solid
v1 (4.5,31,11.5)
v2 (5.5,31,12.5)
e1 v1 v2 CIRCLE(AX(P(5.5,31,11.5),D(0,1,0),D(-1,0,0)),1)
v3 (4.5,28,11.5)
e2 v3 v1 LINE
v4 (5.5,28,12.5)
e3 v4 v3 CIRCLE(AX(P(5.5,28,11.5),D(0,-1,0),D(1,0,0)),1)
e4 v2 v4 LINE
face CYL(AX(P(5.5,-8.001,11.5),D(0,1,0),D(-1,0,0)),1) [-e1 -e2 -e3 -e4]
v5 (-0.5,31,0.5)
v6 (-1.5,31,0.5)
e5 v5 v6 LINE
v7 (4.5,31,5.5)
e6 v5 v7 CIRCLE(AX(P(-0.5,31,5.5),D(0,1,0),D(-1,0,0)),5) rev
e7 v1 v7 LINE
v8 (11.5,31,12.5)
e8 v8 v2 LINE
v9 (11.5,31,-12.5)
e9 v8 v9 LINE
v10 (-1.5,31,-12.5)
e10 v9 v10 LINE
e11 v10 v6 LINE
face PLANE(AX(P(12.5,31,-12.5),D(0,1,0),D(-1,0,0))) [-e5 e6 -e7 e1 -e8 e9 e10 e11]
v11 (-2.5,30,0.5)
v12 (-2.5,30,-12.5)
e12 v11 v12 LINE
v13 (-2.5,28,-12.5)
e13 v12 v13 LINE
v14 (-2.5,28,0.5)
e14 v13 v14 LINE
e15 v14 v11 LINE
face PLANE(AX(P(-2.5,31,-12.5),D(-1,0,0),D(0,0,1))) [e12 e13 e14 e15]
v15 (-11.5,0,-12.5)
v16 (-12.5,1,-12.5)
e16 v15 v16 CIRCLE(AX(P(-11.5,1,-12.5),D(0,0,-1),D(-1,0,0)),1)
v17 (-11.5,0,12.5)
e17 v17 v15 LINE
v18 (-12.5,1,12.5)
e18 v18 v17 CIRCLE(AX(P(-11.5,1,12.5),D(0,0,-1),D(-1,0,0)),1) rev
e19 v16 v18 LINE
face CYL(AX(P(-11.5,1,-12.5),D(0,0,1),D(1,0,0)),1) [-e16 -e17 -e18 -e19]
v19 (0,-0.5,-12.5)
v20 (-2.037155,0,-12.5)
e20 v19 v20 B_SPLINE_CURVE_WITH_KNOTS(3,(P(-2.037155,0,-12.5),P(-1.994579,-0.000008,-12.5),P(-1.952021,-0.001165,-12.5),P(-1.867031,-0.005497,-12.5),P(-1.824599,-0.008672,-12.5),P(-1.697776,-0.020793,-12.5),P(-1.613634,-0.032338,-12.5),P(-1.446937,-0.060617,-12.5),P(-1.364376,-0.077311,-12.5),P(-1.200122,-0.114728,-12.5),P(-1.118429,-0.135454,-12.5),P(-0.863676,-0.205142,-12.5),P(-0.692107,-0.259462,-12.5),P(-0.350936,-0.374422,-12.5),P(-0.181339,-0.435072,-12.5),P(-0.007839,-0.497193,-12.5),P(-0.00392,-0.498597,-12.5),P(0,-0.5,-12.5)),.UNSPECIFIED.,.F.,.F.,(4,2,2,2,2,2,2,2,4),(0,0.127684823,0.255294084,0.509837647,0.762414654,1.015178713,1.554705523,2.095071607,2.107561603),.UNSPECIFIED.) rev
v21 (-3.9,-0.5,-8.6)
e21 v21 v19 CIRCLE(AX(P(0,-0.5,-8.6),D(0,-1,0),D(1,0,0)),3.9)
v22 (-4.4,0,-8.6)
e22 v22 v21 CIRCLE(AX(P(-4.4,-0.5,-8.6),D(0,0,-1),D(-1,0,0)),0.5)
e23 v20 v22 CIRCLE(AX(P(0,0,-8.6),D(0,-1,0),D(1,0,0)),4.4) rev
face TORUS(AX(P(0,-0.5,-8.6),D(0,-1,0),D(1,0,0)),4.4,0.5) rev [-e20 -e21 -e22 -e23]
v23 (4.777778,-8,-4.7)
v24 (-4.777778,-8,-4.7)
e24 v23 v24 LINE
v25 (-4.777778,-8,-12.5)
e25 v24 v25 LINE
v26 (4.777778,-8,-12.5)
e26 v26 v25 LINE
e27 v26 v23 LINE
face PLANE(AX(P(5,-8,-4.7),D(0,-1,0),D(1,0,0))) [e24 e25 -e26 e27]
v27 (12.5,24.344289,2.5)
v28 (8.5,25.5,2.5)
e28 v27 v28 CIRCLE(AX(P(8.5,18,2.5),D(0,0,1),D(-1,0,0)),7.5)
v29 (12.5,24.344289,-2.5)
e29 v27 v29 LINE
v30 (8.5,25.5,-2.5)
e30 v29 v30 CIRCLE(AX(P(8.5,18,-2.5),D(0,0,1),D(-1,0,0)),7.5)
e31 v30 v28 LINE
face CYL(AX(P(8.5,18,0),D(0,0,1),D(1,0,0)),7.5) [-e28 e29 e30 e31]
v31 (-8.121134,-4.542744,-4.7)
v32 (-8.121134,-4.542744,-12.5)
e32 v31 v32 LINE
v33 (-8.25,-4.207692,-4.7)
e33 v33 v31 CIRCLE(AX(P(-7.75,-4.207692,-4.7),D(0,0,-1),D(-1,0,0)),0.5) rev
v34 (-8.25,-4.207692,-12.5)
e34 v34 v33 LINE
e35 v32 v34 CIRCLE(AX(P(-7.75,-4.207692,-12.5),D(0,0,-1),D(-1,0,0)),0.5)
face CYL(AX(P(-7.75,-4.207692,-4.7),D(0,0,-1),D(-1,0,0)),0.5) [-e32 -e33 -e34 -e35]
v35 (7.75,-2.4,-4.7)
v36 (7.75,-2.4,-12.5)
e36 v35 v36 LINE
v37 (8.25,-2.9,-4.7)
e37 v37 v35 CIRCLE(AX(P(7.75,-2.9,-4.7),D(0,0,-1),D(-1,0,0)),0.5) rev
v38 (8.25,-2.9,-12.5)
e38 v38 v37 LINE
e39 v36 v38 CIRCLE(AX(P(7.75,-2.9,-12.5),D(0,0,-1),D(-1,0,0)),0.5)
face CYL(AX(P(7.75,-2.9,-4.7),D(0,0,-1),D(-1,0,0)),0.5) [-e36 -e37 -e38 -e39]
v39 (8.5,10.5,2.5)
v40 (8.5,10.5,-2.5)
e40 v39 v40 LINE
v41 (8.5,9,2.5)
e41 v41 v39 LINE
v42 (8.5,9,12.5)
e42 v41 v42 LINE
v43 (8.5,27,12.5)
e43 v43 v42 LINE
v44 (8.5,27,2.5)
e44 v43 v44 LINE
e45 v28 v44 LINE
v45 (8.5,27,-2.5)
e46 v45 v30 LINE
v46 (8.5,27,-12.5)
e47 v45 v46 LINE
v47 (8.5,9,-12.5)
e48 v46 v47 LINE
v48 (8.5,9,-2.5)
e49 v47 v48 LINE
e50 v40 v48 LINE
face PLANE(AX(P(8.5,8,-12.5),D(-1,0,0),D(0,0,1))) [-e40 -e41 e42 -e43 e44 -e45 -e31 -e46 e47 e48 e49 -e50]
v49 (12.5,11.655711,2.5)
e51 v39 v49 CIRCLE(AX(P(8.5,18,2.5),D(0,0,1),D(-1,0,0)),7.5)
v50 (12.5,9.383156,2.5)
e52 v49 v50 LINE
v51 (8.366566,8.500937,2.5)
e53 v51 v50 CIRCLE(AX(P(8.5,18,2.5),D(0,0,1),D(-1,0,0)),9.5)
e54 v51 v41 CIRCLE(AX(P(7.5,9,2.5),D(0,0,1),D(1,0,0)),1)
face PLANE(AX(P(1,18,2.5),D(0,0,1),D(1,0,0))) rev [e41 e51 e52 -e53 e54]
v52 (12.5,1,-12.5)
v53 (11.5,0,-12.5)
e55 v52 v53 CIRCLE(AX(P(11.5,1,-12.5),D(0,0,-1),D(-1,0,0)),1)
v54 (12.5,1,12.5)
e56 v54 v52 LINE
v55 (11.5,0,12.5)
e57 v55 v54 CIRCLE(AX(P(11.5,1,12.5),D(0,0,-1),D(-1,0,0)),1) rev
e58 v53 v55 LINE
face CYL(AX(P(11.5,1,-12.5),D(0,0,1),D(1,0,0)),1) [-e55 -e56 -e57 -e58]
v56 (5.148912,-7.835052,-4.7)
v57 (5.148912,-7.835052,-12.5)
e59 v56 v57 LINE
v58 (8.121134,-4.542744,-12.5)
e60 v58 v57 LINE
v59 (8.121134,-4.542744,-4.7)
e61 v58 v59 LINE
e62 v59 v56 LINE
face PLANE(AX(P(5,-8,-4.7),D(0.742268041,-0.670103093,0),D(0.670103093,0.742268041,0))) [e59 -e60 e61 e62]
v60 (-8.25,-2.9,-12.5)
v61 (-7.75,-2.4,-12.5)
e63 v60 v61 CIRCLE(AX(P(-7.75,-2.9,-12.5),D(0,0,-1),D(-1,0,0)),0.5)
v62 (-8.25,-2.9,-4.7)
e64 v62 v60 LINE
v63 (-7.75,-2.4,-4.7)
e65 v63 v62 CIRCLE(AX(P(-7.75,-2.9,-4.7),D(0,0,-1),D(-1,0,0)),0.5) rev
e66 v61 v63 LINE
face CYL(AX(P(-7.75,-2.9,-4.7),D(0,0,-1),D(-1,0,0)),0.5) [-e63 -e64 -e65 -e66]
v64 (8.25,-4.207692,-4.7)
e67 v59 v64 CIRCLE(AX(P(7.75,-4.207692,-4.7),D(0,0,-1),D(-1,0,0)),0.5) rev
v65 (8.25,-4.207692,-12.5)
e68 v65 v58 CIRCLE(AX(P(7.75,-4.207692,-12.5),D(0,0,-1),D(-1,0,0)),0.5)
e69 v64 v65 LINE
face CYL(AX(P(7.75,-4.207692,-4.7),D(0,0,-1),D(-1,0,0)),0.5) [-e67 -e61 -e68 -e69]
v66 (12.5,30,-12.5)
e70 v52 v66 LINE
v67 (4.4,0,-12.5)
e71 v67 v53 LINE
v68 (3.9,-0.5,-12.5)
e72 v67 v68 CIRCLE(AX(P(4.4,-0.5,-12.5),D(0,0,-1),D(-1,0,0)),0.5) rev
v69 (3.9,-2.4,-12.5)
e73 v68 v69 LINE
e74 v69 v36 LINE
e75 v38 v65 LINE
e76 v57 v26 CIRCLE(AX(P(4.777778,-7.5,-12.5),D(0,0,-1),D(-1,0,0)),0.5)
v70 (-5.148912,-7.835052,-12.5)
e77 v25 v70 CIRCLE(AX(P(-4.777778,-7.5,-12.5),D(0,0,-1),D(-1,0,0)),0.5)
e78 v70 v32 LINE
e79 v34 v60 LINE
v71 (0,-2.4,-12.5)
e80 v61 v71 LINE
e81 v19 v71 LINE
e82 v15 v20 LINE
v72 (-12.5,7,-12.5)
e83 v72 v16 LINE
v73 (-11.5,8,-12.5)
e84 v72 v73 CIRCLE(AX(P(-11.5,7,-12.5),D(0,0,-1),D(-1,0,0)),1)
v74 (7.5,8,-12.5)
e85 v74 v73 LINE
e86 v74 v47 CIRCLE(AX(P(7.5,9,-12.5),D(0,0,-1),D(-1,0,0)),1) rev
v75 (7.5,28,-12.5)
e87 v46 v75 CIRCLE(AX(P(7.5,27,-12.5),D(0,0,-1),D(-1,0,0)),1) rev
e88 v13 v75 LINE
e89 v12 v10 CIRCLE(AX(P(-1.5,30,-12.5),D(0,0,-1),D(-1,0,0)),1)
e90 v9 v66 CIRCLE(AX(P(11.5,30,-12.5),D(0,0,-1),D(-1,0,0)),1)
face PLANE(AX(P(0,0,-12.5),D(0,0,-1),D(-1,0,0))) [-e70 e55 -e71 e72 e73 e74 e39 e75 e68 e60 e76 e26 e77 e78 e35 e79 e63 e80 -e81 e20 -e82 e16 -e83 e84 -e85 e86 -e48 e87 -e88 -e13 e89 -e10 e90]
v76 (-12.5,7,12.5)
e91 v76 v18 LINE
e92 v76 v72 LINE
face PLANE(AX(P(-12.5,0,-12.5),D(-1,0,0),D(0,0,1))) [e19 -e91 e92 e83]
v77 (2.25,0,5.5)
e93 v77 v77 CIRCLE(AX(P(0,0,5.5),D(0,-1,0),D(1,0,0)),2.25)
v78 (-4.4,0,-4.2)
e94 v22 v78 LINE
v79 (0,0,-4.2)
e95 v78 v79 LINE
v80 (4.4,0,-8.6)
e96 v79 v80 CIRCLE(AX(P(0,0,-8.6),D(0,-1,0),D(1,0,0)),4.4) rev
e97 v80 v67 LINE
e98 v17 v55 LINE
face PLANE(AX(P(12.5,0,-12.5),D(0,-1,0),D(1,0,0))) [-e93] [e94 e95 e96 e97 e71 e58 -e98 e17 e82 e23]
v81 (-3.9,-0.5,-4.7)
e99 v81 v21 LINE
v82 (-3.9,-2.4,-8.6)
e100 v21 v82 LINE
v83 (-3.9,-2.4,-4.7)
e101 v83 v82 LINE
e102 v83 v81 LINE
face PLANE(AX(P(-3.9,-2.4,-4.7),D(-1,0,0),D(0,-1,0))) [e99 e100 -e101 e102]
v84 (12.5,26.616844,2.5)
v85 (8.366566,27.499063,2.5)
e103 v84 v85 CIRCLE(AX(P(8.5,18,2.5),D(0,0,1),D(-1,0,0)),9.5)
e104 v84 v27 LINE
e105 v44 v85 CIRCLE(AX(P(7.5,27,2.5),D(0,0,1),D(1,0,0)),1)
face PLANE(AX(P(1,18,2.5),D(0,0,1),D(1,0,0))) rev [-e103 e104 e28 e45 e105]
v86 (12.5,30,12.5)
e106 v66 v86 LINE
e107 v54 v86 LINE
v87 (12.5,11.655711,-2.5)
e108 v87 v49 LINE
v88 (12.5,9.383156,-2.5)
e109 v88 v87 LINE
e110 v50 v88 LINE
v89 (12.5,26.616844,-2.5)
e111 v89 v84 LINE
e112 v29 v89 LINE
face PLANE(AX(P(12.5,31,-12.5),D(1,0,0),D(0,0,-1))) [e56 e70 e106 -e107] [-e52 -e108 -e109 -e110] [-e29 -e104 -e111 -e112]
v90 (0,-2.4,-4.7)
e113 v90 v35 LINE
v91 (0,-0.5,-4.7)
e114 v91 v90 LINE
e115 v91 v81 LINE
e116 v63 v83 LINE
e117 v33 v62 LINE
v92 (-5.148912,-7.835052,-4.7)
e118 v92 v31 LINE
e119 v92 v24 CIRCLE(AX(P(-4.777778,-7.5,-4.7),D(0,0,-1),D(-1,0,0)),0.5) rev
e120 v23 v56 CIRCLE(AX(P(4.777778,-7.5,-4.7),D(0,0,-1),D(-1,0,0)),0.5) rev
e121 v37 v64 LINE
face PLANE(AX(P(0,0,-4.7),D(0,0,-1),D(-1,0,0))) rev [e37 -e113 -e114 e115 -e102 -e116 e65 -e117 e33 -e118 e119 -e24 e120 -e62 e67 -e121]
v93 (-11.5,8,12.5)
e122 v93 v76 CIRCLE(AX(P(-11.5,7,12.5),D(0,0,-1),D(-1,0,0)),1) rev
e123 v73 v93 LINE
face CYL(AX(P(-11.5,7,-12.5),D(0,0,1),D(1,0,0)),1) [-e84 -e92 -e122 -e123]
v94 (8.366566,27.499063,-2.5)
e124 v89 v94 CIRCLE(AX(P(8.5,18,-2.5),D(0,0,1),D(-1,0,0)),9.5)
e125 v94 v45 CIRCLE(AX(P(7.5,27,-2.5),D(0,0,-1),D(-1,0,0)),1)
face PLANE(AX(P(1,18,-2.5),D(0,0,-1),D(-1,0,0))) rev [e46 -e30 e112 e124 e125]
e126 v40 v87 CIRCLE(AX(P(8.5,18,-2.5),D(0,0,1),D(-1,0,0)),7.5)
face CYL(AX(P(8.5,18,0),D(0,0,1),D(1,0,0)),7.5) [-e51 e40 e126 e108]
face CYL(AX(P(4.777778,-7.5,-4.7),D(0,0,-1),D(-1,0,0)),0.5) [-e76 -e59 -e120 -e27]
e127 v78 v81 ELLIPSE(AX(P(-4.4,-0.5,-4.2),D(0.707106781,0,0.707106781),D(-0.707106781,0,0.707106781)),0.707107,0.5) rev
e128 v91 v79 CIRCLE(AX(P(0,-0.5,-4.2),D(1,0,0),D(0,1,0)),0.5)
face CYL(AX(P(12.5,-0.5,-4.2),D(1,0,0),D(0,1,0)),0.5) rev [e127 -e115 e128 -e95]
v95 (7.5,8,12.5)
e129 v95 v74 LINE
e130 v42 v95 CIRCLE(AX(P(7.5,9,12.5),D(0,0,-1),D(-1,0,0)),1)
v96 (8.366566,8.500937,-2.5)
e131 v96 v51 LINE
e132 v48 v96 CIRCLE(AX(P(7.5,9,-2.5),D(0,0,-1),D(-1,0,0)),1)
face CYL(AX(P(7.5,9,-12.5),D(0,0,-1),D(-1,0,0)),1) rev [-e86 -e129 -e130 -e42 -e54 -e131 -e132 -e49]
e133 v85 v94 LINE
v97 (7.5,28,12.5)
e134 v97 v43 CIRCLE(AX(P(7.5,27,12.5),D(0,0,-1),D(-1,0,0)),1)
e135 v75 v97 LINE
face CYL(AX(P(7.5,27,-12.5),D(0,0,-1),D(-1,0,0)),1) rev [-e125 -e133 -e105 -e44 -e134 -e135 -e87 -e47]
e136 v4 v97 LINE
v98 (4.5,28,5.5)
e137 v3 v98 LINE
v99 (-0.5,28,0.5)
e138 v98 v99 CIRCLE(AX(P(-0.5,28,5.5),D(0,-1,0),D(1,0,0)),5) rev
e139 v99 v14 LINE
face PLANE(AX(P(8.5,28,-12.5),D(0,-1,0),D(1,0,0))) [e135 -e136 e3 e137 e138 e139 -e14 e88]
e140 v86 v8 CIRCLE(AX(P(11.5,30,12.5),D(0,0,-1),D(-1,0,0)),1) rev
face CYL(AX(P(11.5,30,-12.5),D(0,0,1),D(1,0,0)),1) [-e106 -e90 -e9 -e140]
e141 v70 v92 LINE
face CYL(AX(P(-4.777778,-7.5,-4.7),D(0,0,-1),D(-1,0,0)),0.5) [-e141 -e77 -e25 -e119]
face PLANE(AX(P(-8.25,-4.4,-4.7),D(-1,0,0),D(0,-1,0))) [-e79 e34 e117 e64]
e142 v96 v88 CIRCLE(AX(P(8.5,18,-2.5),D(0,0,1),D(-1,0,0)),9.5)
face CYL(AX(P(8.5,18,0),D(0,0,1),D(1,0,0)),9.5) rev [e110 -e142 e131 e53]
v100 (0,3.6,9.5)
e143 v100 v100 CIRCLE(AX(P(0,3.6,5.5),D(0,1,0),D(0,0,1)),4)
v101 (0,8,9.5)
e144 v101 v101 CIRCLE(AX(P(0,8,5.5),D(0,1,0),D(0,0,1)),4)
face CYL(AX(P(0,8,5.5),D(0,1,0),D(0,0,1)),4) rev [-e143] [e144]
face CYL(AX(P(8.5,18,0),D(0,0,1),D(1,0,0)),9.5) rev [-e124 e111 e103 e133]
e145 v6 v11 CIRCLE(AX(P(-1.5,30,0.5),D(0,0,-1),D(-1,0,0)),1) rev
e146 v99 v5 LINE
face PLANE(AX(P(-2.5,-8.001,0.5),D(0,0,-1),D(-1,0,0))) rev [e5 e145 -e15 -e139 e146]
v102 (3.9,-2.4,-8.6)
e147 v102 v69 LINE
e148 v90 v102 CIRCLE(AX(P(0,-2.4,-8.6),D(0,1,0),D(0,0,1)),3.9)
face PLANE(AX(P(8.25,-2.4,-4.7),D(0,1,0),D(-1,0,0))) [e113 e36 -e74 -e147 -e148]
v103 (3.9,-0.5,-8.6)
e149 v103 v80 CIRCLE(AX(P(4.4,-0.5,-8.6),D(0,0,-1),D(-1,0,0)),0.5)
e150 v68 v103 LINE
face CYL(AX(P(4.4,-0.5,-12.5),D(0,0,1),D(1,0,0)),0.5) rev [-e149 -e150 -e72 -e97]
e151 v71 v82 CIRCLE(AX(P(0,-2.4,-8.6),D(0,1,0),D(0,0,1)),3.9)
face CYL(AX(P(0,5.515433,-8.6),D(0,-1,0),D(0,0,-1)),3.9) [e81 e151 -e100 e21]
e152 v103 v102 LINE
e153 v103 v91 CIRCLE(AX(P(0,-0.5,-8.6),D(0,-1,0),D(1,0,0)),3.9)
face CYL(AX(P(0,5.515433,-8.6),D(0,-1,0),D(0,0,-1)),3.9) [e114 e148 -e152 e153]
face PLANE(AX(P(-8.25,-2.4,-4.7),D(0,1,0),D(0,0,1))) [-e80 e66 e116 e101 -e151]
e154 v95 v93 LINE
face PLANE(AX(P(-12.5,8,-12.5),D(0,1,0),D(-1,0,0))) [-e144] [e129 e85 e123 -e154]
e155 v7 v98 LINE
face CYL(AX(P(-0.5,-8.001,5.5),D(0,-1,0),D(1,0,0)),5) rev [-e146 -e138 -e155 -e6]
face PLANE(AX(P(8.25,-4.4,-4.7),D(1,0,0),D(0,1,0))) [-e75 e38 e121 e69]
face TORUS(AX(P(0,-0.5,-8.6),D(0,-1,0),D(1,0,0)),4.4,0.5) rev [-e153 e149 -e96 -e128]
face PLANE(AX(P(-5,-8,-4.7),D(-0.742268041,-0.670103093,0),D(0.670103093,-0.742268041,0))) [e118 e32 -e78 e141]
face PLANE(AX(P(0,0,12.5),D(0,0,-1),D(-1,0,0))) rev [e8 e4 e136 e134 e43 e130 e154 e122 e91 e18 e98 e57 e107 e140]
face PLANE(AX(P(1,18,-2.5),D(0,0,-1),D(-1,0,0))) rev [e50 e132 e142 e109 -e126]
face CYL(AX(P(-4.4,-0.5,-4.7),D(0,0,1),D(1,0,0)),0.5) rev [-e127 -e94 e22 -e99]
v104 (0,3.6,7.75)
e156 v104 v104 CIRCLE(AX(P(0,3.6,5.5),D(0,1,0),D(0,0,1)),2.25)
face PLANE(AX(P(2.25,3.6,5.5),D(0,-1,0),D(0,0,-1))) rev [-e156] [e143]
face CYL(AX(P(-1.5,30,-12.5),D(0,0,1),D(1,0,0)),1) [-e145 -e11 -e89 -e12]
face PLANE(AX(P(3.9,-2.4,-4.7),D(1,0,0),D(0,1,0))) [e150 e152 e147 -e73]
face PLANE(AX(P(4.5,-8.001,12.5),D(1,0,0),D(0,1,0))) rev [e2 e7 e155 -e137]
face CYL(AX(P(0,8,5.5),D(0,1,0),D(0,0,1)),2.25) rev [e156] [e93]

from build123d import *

# Parameters (mm, degrees)
BOSS_EXTRUDE1_DEPTH                                 = 12.5
CBORE_FOR_M4_HEX_SOCKET_HEAD_CAP_SCREW1_D           = 4.5
CBORE_FOR_M4_HEX_SOCKET_HEAD_CAP_SCREW1_DEPTH       = 8
CBORE_FOR_M4_HEX_SOCKET_HEAD_CAP_SCREW1_CBORE_D     = 8
CBORE_FOR_M4_HEX_SOCKET_HEAD_CAP_SCREW1_CBORE_DEPTH = 4.4
BOSS_EXTRUDE3_DEPTH                                 = 7.8
CUT_EXTRUDE3_REACH                                  = 44.819
SKETCH15_W                                          = 6.999999999999991
SKETCH15_H                                          = 12.000000000000002
CUT_EXTRUDE1_DEPTH                                  = 2.4
FILLET3_R                                           = 0.5
SKETCH13_W                                          = 1.9999999999999998
SKETCH13_H                                          = 5
FILLET4_START                                       = 28
FILLET4_DEPTH                                       = 3
FILLET4_START_2                                     = -12.5
FILLET4_2_DEPTH                                     = 25
FILLET4_3_DEPTH                                     = 10
FILLET4_START_3                                     = 2.5
FILLET4_4_DEPTH                                     = 10
FILLET4_START_4                                     = 27
FILLET4_5_DEPTH                                     = 5
FILLET4_START_5                                     = -13
FILLET4_6_DEPTH                                     = 26


with BuildPart() as part:
    # Sketch1 → Boss-Extrude1 (new, symmetric)
    with BuildSketch(Plane.XY):
        Polygon((-12.5, 7.999999999999993), (8.500000000000004, 7.9999999999999885), (8.500000000000004, 27.999999999999982), (-2.4999999999999987, 27.999999999999975), (-2.4999999999999987, 30.99999999999999), (12.5, 31), (12.5, -2.94e-15), (-12.5, -1.41e-15), align=None)
    extrude(amount=BOSS_EXTRUDE1_DEPTH, both=True)

    # CBORE for M4 Hex Socket Head Cap Screw1
    with Locations(Plane(origin=(1.98e-15, 7.999999999999989, 0), x_dir=(1, -1.1e-16, 0), z_dir=(1.1e-16, 1, 0))):
        with Locations((0, -5.5)):
            CounterBoreHole(CBORE_FOR_M4_HEX_SOCKET_HEAD_CAP_SCREW1_D / 2, CBORE_FOR_M4_HEX_SOCKET_HEAD_CAP_SCREW1_CBORE_D / 2, CBORE_FOR_M4_HEX_SOCKET_HEAD_CAP_SCREW1_CBORE_DEPTH, depth=CBORE_FOR_M4_HEX_SOCKET_HEAD_CAP_SCREW1_DEPTH)

    # Sketch5 → Boss-Extrude3 (add)
    with BuildSketch(Plane(origin=(0, 0, -12.5), x_dir=(-1, 0, 0), z_dir=(0, 0, -1))):
        Polygon((-4.999999999999999, -8), (5.000000000000001, -7.999999999999998), (8.249999999999996, -4.400000000000003), (8.25, -2.400000000000003), (3.9000000000000012, -2.400000000000003), (3.9, -3.06e-15), (-3.9, -4.02e-15), (-3.9000000000000004, -2.400000000000004), (-8.25, -2.400000000000005), (-8.249999999999996, -4.400000000000005), align=None)
    extrude(amount=-BOSS_EXTRUDE3_DEPTH)

    # Sketch15 → Cut-Extrude3 (cut, up to next)
    with BuildSketch(Plane(origin=(-2.151e-14, 30.999999999999993, 0), x_dir=(1, 6.9e-16, 0), z_dir=(-6.9e-16, 1, 0)), mode=Mode.PRIVATE) as cut_extrude3_sk1:
        with Locations((1.0000000000000187, -6.500000000000001)):
            Rectangle(SKETCH15_W, SKETCH15_H)
    cut_extrude3_tool1 = extrude(cut_extrude3_sk1.sketch, amount=-CUT_EXTRUDE3_REACH, mode=Mode.PRIVATE) & part.part
    add(cut_extrude3_tool1.solids().sort_by_distance((1, 31, 6.5))[0], mode=Mode.SUBTRACT)

    # Sketch6 → Cut-Extrude1 (cut)
    with BuildSketch(Plane(origin=(0, -2.400000000000003, 0), x_dir=(1, 0, 0), z_dir=(0, 1, 0))):
        with BuildLine():
            ThreePointArc((-3.900000000000001, 8.600000000000001), (-2.7577164466274824, 11.357716446627592), (1.491e-13, 12.500000000000004))
            Line((1.4921e-13, 12.5), (-3.9, 12.5))
            Line((-3.9, 12.5), (-3.9, 8.600000000000005))
        make_face()
        with BuildLine():
            Line((3.9, 4.700000000000001), (3.9000000000000004, 8.600000000000001))
            ThreePointArc((3.9000000000000026, 8.6), (2.7577164513941343, 5.842283558139062), (1.348197454e-08, 4.699999999999999))
            Line((1.348197465e-08, 4.700000000000001), (3.9, 4.700000000000001))
        make_face()
    extrude(amount=CUT_EXTRUDE1_DEPTH, mode=Mode.SUBTRACT)

    # Fillet3
    # the kernel refuses this fillet: 0.5 mm, written as the material it adds along each edge
    with BuildSketch(Plane(origin=(-3.9, -3.06e-15, -4.7), x_dir=(0, 2.38e-15, 1), z_dir=(1, -1.2e-16, 0))) as fillet3_piece_1:
        with BuildLine():
            CenterArc((FILLET3_R, FILLET3_R), FILLET3_R, 180, 90.00000000000011)
            Line((-1.19e-15, FILLET3_R), (0, 0))
            Line((0, 0), (FILLET3_R, 0))
        make_face()
    extrude(amount=3.9000000134819746)
    with BuildSketch(Plane(origin=(-3.9, -3.06e-15, -8.600000000000003), x_dir=(-1, 2.35e-15, 0), z_dir=(0, 0, 1))) as fillet3_piece_2:
        with BuildLine():
            CenterArc((FILLET3_R, FILLET3_R), FILLET3_R, 179.99999999999997, 90.00000000000017)
            Line((-2.51e-15, FILLET3_R), (0, 0))
            Line((0, 0), (FILLET3_R, 0))
        make_face()
    extrude(amount=3.900000000000003)
    with BuildSketch(Plane(origin=(3.9, -4.02e-15, -12.5), x_dir=(1, 3.15e-15, 0), z_dir=(0, 0, 1))) as fillet3_piece_3:
        with BuildLine():
            CenterArc((FILLET3_R, -FILLET3_R), FILLET3_R, 89.99999999999982, 90.00000000000017)
            Line((-1.13e-15, -FILLET3_R), (0, 0))
            Line((0, 0), (FILLET3_R, 0))
        make_face()
    extrude(amount=3.8999999999999986)
    with BuildSketch(Plane(origin=(-1.78e-15, -3.11e-15, -8.600000000000005), x_dir=(1, 0, 1.37e-15), z_dir=(1.37e-15, 0, -1))) as fillet3_piece_4:
        with BuildLine():
            CenterArc((3.9000000000000057 + FILLET3_R, FILLET3_R), FILLET3_R, 179.99999999999991, 90.00000000000011)
            Line((3.9000000000000057, FILLET3_R), (3.9000000000000057, 0))
            Line((3.9000000000000057, 0), (3.9000000000000057 + FILLET3_R, -7.8e-16))
        make_face()
    revolve(axis=Axis((-1.78e-15, -3.11e-15, -8.600000000000005), (0, -1, 0)), revolution_arc=89.99999980193317)
    with BuildSketch(Plane(origin=(-4.4e-16, -3.11e-15, -8.600000000000005), x_dir=(-1, 0, 9.1e-16), z_dir=(9.1e-16, 0, 1))) as fillet3_piece_5_section:
        with BuildLine():
            CenterArc((3.9 + FILLET3_R, FILLET3_R), FILLET3_R, 179.99999999999986, 90.00000000000011)
            Line((3.9, FILLET3_R), (3.9, 0))
            Line((3.9, 0), (3.9 + FILLET3_R, -1.11e-15))
        make_face()
    fillet3_piece_5 = revolve(axis=Axis((-4.4e-16, -3.11e-15, -8.600000000000005), (0, -1, 0)), revolution_arc=121.23139509020365, mode=Mode.PRIVATE)
    fillet3_piece_5 = split(fillet3_piece_5, bisect_by=Plane(origin=(-4.4e-16, -3.11e-15, -12.5), z_dir=(0, 0, 1)), keep=Keep.TOP, mode=Mode.PRIVATE)
    add(fillet3_piece_5)
    with BuildSketch(Plane(origin=(-5.15, -2.91e-15, -4.7), x_dir=(0, 2.38e-15, 1), z_dir=(1, -1.2e-16, 0))) as fillet3_piece_6a_section:
        with BuildLine():
            CenterArc((FILLET3_R, FILLET3_R), FILLET3_R, 180, 90.00000000000011)
            Line((-1.19e-15, FILLET3_R), (0, 0))
            Line((0, 0), (FILLET3_R, 0))
        make_face()
    fillet3_piece_6a = extrude(amount=5.150000013481975, mode=Mode.PRIVATE)
    fillet3_piece_6a = split(fillet3_piece_6a, bisect_by=Plane(origin=(-3.9, -3.6e-15, -4.7), z_dir=(-1, 5.6e-16, 0)), keep=Keep.TOP, mode=Mode.PRIVATE)
    with BuildSketch(Plane(origin=(-3.9, -3.06e-15, -8.600000000000003), x_dir=(-1, 2.35e-15, 0), z_dir=(0, 0, 1))) as fillet3_piece_6b_section:
        with BuildLine():
            CenterArc((FILLET3_R, FILLET3_R), FILLET3_R, 179.99999999999997, 90.00000000000017)
            Line((-2.51e-15, FILLET3_R), (0, 0))
            Line((0, 0), (FILLET3_R, 0))
        make_face()
    fillet3_piece_6b = extrude(amount=5.150000000000004, mode=Mode.PRIVATE)
    fillet3_piece_6b = split(fillet3_piece_6b, bisect_by=Plane(origin=(-3.9, -3.06e-15, -4.7), z_dir=(0, 0, 1)), keep=Keep.TOP, mode=Mode.PRIVATE)
    fillet3_piece_6 = fillet3_piece_6a & fillet3_piece_6b
    add(fillet3_piece_6)
    # the kernel refuses this fillet: 0.5 mm, written as the material it takes off along each edge
    with BuildSketch(Plane(origin=(-8.249999999999996, -4.400000000000003, -12.98076923076923), x_dir=(0.6701030927835051, -0.7422680412371134, 0), z_dir=(0, 0, 1))) as fillet3_2_piece_1:
        with BuildLine():
            CenterArc((FILLET3_R * 0.384615384615, FILLET3_R), FILLET3_R, 227.92497794915644, 42.07502205084347)
            Line((-FILLET3_R * 0.285487708168, FILLET3_R * 0.257731958763), (0, 0))
            Line((0, 0), (FILLET3_R * 0.384615384615, 1e-17))
        make_face()
    extrude(amount=8.761538461538459, mode=Mode.SUBTRACT)
    with BuildSketch(Plane(origin=(-5.000000000000001, -7.999999999999998, -13.055555555555557), x_dir=(1, 0, 0), z_dir=(0, 0, 1))) as fillet3_2_piece_2:
        with BuildLine():
            CenterArc((FILLET3_R * 0.444444444444, FILLET3_R), FILLET3_R, 222.07502205084361, 47.924977949156414)
            Line((-FILLET3_R * 0.297823596793, FILLET3_R * 0.329896907216), (0, 0))
            Line((0, 0), (FILLET3_R * 0.444444444444, 0))
        make_face()
    extrude(amount=8.911111111111113, mode=Mode.SUBTRACT)
    with BuildSketch(Plane(origin=(4.999999999999999, -8, -13.055555555555555), x_dir=(0.6701030927835051, 0.7422680412371134, 0), z_dir=(0, 0, 1))) as fillet3_2_piece_3:
        with BuildLine():
            CenterArc((FILLET3_R * 0.444444444444, FILLET3_R), FILLET3_R, 222.07502205084361, 47.9249779491563)
            Line((-FILLET3_R * 0.297823596793, FILLET3_R * 0.329896907216), (0, 0))
            Line((0, 0), (FILLET3_R * 0.444444444444, -1e-17))
        make_face()
    extrude(amount=8.911111111111111, mode=Mode.SUBTRACT)
    with BuildSketch(Plane(origin=(8.249999999999996, -4.400000000000005, -12.98076923076923), x_dir=(-0.6701030927835051, -0.7422680412371134, 0), z_dir=(0, 0, 1))) as fillet3_2_piece_4:
        with BuildLine():
            CenterArc((FILLET3_R * 0.384615384615, -FILLET3_R), FILLET3_R, 89.99999999999999, 42.07502205084343)
            Line((-FILLET3_R * 0.285487708168, -FILLET3_R * 0.257731958763), (0, 0))
            Line((0, 0), (FILLET3_R * 0.384615384615, -1e-17))
        make_face()
    extrude(amount=8.761538461538459, mode=Mode.SUBTRACT)
    with BuildSketch(Plane(origin=(8.25, -2.400000000000005, -13.750000000000002), x_dir=(-1, 0, 0), z_dir=(0, 0, 1))) as fillet3_2_piece_5:
        with BuildLine():
            CenterArc((FILLET3_R, FILLET3_R), FILLET3_R, 179.9999999999999, 90.00000000000011)
            Line((0, FILLET3_R), (0, 0))
            Line((0, 0), (FILLET3_R, 0))
        make_face()
    extrude(amount=10.300000000000004, mode=Mode.SUBTRACT)
    with BuildSketch(Plane(origin=(-8.25, -2.400000000000003, -13.750000000000002), x_dir=(3.55e-15, -1, 0), z_dir=(0, 0, 1))) as fillet3_2_piece_6:
        with BuildLine():
            CenterArc((FILLET3_R, FILLET3_R), FILLET3_R, 180, 89.99999999999989)
            Line((1.33e-15, FILLET3_R), (0, 0))
            Line((0, 0), (FILLET3_R, 0))
        make_face()
    extrude(amount=10.300000000000002, mode=Mode.SUBTRACT)

    # Cut-Sweep1: sweep along a path in Sketch7
    with BuildLine(Plane.XY) as cut_sweep1_path:
        EllipticalCenterArc((8.500000000000004, 17.99999999999999), 7.5, 7.5, start_angle=0, arc_size=360, rotation=-89.99999999999999)
    # Sketch13 → Cut-Sweep1 (sweep, cut)
    with BuildSketch(Plane(origin=(1.0000000000000044, 17.99999999999999, 0), x_dir=(-1, 3.3e-16, 0), z_dir=(-3.3e-16, -1, 0))):
        with Locations((0.9999999999999983, 0)):
            Rectangle(SKETCH13_W, SKETCH13_H)
    sweep(path=cut_sweep1_path.line, mode=Mode.SUBTRACT)

    # Fillet4: read off the stored shape, not the designer's step
    # Fillet4 outline → Fillet4 (add)
    with BuildSketch(Plane(origin=(0, 0, 0), x_dir=(1, 0, 0), z_dir=(0, 1, 0)).offset(FILLET4_START)):
        with BuildLine():
            Line((4.5, -0.5), (-0.5, -0.5))
            ThreePointArc((-0.5, -0.5), (3.035533906, -1.964466094), (4.5, -5.5))
            Line((4.5, -5.5), (4.5, -0.5))
        make_face()
    extrude(amount=FILLET4_DEPTH)

    # Fillet4 2 outline → Fillet4 2 (add)
    with BuildSketch(Plane.XY.offset(FILLET4_START_2)):
        with BuildLine():
            Line((8.5, 28), (7.5, 28))
            ThreePointArc((7.5, 28), (8.000468348, 27.865754834), (8.366565783, 27.499062865))
            ThreePointArc((8.366565783, 27.499062865), (8.433281246, 27.499765713), (8.5, 27.5))
            Line((8.5, 27.5), (8.5, 28))
        make_face()
        with BuildLine():
            ThreePointArc((8.5, 8.5), (8.433281246, 8.500234287), (8.366565783, 8.500937135))
            ThreePointArc((8.366565783, 8.500937135), (8.000468348, 8.134245166), (7.5, 8))
            Line((7.5, 8), (8.5, 8))
            Line((8.5, 8), (8.5, 8.5))
        make_face()
    extrude(amount=FILLET4_2_DEPTH)

    # Fillet4 3 outline → Fillet4 3 (add)
    with BuildSketch(Plane.XY.offset(FILLET4_START_2)):
        with BuildLine():
            ThreePointArc((8.5, 27.5), (8.433281246, 27.499765713), (8.366565783, 27.499062865))
            ThreePointArc((8.366565783, 27.499062865), (8.466065677, 27.258296551), (8.5, 27))
            Line((8.5, 27), (8.5, 27.5))
        make_face()
        with BuildLine():
            Line((8.5, 8.5), (8.5, 9))
            ThreePointArc((8.5, 9), (8.466065677, 8.741703449), (8.366565783, 8.500937135))
            ThreePointArc((8.366565783, 8.500937135), (8.433281246, 8.500234287), (8.5, 8.5))
        make_face()
    extrude(amount=FILLET4_3_DEPTH)

    # Fillet4 4 outline → Fillet4 4 (add)
    with BuildSketch(Plane.XY.offset(FILLET4_START_3)):
        with BuildLine():
            ThreePointArc((8.5, 27.5), (8.433281246, 27.499765713), (8.366565783, 27.499062865))
            ThreePointArc((8.366565783, 27.499062865), (8.466065677, 27.258296551), (8.5, 27))
            Line((8.5, 27), (8.5, 27.5))
        make_face()
        with BuildLine():
            Line((8.5, 8.5), (8.5, 9))
            ThreePointArc((8.5, 9), (8.466065677, 8.741703449), (8.366565783, 8.500937135))
            ThreePointArc((8.366565783, 8.500937135), (8.433281246, 8.500234287), (8.5, 8.5))
        make_face()
    extrude(amount=FILLET4_4_DEPTH)

    # Fillet4 5 outline → Fillet4 5 (cut)
    with BuildSketch(Plane(origin=(0, 0, 0), x_dir=(1, 0, 0), z_dir=(0, 1, 0)).offset(FILLET4_START_4)):
        with BuildLine():
            ThreePointArc((5.5, -12.5), (4.792893219, -12.207106781), (4.5, -11.5))
            Line((4.5, -11.5), (4.5, -12.5))
            Line((4.5, -12.5), (5.5, -12.5))
        make_face()
    extrude(amount=FILLET4_5_DEPTH, mode=Mode.SUBTRACT)

    # Fillet4 6 outline → Fillet4 6 (cut)
    with BuildSketch(Plane.XY.offset(FILLET4_START_5)):
        with BuildLine():
            Line((-2.5, 31), (-2.5, 30))
            ThreePointArc((-2.5, 30), (-2.207106781, 30.707106781), (-1.5, 31))
            Line((-1.5, 31), (-2.5, 31))
        make_face()
        with BuildLine():
            Line((12.5, 31), (11.5, 31))
            ThreePointArc((11.5, 31), (12.207106781, 30.707106781), (12.5, 30))
            Line((12.5, 30), (12.5, 31))
        make_face()
        with BuildLine():
            Line((12.5, 0), (12.5, 1))
            ThreePointArc((12.5, 1), (12.207106781, 0.292893219), (11.5, 0))
            Line((11.5, 0), (12.5, 0))
        make_face()
        with BuildLine():
            ThreePointArc((-12.5, 7), (-12.207106781, 7.707106781), (-11.5, 8))
            Line((-11.5, 8), (-12.5, 8))
            Line((-12.5, 8), (-12.5, 7))
        make_face()
        with BuildLine():
            Line((-12.5, 0), (-11.5, 0))
            ThreePointArc((-11.5, 0), (-12.207106781, 0.292893219), (-12.5, 1))
            Line((-12.5, 1), (-12.5, 0))
        make_face()
    extrude(amount=FILLET4_6_DEPTH, mode=Mode.SUBTRACT)


solid = part.part
